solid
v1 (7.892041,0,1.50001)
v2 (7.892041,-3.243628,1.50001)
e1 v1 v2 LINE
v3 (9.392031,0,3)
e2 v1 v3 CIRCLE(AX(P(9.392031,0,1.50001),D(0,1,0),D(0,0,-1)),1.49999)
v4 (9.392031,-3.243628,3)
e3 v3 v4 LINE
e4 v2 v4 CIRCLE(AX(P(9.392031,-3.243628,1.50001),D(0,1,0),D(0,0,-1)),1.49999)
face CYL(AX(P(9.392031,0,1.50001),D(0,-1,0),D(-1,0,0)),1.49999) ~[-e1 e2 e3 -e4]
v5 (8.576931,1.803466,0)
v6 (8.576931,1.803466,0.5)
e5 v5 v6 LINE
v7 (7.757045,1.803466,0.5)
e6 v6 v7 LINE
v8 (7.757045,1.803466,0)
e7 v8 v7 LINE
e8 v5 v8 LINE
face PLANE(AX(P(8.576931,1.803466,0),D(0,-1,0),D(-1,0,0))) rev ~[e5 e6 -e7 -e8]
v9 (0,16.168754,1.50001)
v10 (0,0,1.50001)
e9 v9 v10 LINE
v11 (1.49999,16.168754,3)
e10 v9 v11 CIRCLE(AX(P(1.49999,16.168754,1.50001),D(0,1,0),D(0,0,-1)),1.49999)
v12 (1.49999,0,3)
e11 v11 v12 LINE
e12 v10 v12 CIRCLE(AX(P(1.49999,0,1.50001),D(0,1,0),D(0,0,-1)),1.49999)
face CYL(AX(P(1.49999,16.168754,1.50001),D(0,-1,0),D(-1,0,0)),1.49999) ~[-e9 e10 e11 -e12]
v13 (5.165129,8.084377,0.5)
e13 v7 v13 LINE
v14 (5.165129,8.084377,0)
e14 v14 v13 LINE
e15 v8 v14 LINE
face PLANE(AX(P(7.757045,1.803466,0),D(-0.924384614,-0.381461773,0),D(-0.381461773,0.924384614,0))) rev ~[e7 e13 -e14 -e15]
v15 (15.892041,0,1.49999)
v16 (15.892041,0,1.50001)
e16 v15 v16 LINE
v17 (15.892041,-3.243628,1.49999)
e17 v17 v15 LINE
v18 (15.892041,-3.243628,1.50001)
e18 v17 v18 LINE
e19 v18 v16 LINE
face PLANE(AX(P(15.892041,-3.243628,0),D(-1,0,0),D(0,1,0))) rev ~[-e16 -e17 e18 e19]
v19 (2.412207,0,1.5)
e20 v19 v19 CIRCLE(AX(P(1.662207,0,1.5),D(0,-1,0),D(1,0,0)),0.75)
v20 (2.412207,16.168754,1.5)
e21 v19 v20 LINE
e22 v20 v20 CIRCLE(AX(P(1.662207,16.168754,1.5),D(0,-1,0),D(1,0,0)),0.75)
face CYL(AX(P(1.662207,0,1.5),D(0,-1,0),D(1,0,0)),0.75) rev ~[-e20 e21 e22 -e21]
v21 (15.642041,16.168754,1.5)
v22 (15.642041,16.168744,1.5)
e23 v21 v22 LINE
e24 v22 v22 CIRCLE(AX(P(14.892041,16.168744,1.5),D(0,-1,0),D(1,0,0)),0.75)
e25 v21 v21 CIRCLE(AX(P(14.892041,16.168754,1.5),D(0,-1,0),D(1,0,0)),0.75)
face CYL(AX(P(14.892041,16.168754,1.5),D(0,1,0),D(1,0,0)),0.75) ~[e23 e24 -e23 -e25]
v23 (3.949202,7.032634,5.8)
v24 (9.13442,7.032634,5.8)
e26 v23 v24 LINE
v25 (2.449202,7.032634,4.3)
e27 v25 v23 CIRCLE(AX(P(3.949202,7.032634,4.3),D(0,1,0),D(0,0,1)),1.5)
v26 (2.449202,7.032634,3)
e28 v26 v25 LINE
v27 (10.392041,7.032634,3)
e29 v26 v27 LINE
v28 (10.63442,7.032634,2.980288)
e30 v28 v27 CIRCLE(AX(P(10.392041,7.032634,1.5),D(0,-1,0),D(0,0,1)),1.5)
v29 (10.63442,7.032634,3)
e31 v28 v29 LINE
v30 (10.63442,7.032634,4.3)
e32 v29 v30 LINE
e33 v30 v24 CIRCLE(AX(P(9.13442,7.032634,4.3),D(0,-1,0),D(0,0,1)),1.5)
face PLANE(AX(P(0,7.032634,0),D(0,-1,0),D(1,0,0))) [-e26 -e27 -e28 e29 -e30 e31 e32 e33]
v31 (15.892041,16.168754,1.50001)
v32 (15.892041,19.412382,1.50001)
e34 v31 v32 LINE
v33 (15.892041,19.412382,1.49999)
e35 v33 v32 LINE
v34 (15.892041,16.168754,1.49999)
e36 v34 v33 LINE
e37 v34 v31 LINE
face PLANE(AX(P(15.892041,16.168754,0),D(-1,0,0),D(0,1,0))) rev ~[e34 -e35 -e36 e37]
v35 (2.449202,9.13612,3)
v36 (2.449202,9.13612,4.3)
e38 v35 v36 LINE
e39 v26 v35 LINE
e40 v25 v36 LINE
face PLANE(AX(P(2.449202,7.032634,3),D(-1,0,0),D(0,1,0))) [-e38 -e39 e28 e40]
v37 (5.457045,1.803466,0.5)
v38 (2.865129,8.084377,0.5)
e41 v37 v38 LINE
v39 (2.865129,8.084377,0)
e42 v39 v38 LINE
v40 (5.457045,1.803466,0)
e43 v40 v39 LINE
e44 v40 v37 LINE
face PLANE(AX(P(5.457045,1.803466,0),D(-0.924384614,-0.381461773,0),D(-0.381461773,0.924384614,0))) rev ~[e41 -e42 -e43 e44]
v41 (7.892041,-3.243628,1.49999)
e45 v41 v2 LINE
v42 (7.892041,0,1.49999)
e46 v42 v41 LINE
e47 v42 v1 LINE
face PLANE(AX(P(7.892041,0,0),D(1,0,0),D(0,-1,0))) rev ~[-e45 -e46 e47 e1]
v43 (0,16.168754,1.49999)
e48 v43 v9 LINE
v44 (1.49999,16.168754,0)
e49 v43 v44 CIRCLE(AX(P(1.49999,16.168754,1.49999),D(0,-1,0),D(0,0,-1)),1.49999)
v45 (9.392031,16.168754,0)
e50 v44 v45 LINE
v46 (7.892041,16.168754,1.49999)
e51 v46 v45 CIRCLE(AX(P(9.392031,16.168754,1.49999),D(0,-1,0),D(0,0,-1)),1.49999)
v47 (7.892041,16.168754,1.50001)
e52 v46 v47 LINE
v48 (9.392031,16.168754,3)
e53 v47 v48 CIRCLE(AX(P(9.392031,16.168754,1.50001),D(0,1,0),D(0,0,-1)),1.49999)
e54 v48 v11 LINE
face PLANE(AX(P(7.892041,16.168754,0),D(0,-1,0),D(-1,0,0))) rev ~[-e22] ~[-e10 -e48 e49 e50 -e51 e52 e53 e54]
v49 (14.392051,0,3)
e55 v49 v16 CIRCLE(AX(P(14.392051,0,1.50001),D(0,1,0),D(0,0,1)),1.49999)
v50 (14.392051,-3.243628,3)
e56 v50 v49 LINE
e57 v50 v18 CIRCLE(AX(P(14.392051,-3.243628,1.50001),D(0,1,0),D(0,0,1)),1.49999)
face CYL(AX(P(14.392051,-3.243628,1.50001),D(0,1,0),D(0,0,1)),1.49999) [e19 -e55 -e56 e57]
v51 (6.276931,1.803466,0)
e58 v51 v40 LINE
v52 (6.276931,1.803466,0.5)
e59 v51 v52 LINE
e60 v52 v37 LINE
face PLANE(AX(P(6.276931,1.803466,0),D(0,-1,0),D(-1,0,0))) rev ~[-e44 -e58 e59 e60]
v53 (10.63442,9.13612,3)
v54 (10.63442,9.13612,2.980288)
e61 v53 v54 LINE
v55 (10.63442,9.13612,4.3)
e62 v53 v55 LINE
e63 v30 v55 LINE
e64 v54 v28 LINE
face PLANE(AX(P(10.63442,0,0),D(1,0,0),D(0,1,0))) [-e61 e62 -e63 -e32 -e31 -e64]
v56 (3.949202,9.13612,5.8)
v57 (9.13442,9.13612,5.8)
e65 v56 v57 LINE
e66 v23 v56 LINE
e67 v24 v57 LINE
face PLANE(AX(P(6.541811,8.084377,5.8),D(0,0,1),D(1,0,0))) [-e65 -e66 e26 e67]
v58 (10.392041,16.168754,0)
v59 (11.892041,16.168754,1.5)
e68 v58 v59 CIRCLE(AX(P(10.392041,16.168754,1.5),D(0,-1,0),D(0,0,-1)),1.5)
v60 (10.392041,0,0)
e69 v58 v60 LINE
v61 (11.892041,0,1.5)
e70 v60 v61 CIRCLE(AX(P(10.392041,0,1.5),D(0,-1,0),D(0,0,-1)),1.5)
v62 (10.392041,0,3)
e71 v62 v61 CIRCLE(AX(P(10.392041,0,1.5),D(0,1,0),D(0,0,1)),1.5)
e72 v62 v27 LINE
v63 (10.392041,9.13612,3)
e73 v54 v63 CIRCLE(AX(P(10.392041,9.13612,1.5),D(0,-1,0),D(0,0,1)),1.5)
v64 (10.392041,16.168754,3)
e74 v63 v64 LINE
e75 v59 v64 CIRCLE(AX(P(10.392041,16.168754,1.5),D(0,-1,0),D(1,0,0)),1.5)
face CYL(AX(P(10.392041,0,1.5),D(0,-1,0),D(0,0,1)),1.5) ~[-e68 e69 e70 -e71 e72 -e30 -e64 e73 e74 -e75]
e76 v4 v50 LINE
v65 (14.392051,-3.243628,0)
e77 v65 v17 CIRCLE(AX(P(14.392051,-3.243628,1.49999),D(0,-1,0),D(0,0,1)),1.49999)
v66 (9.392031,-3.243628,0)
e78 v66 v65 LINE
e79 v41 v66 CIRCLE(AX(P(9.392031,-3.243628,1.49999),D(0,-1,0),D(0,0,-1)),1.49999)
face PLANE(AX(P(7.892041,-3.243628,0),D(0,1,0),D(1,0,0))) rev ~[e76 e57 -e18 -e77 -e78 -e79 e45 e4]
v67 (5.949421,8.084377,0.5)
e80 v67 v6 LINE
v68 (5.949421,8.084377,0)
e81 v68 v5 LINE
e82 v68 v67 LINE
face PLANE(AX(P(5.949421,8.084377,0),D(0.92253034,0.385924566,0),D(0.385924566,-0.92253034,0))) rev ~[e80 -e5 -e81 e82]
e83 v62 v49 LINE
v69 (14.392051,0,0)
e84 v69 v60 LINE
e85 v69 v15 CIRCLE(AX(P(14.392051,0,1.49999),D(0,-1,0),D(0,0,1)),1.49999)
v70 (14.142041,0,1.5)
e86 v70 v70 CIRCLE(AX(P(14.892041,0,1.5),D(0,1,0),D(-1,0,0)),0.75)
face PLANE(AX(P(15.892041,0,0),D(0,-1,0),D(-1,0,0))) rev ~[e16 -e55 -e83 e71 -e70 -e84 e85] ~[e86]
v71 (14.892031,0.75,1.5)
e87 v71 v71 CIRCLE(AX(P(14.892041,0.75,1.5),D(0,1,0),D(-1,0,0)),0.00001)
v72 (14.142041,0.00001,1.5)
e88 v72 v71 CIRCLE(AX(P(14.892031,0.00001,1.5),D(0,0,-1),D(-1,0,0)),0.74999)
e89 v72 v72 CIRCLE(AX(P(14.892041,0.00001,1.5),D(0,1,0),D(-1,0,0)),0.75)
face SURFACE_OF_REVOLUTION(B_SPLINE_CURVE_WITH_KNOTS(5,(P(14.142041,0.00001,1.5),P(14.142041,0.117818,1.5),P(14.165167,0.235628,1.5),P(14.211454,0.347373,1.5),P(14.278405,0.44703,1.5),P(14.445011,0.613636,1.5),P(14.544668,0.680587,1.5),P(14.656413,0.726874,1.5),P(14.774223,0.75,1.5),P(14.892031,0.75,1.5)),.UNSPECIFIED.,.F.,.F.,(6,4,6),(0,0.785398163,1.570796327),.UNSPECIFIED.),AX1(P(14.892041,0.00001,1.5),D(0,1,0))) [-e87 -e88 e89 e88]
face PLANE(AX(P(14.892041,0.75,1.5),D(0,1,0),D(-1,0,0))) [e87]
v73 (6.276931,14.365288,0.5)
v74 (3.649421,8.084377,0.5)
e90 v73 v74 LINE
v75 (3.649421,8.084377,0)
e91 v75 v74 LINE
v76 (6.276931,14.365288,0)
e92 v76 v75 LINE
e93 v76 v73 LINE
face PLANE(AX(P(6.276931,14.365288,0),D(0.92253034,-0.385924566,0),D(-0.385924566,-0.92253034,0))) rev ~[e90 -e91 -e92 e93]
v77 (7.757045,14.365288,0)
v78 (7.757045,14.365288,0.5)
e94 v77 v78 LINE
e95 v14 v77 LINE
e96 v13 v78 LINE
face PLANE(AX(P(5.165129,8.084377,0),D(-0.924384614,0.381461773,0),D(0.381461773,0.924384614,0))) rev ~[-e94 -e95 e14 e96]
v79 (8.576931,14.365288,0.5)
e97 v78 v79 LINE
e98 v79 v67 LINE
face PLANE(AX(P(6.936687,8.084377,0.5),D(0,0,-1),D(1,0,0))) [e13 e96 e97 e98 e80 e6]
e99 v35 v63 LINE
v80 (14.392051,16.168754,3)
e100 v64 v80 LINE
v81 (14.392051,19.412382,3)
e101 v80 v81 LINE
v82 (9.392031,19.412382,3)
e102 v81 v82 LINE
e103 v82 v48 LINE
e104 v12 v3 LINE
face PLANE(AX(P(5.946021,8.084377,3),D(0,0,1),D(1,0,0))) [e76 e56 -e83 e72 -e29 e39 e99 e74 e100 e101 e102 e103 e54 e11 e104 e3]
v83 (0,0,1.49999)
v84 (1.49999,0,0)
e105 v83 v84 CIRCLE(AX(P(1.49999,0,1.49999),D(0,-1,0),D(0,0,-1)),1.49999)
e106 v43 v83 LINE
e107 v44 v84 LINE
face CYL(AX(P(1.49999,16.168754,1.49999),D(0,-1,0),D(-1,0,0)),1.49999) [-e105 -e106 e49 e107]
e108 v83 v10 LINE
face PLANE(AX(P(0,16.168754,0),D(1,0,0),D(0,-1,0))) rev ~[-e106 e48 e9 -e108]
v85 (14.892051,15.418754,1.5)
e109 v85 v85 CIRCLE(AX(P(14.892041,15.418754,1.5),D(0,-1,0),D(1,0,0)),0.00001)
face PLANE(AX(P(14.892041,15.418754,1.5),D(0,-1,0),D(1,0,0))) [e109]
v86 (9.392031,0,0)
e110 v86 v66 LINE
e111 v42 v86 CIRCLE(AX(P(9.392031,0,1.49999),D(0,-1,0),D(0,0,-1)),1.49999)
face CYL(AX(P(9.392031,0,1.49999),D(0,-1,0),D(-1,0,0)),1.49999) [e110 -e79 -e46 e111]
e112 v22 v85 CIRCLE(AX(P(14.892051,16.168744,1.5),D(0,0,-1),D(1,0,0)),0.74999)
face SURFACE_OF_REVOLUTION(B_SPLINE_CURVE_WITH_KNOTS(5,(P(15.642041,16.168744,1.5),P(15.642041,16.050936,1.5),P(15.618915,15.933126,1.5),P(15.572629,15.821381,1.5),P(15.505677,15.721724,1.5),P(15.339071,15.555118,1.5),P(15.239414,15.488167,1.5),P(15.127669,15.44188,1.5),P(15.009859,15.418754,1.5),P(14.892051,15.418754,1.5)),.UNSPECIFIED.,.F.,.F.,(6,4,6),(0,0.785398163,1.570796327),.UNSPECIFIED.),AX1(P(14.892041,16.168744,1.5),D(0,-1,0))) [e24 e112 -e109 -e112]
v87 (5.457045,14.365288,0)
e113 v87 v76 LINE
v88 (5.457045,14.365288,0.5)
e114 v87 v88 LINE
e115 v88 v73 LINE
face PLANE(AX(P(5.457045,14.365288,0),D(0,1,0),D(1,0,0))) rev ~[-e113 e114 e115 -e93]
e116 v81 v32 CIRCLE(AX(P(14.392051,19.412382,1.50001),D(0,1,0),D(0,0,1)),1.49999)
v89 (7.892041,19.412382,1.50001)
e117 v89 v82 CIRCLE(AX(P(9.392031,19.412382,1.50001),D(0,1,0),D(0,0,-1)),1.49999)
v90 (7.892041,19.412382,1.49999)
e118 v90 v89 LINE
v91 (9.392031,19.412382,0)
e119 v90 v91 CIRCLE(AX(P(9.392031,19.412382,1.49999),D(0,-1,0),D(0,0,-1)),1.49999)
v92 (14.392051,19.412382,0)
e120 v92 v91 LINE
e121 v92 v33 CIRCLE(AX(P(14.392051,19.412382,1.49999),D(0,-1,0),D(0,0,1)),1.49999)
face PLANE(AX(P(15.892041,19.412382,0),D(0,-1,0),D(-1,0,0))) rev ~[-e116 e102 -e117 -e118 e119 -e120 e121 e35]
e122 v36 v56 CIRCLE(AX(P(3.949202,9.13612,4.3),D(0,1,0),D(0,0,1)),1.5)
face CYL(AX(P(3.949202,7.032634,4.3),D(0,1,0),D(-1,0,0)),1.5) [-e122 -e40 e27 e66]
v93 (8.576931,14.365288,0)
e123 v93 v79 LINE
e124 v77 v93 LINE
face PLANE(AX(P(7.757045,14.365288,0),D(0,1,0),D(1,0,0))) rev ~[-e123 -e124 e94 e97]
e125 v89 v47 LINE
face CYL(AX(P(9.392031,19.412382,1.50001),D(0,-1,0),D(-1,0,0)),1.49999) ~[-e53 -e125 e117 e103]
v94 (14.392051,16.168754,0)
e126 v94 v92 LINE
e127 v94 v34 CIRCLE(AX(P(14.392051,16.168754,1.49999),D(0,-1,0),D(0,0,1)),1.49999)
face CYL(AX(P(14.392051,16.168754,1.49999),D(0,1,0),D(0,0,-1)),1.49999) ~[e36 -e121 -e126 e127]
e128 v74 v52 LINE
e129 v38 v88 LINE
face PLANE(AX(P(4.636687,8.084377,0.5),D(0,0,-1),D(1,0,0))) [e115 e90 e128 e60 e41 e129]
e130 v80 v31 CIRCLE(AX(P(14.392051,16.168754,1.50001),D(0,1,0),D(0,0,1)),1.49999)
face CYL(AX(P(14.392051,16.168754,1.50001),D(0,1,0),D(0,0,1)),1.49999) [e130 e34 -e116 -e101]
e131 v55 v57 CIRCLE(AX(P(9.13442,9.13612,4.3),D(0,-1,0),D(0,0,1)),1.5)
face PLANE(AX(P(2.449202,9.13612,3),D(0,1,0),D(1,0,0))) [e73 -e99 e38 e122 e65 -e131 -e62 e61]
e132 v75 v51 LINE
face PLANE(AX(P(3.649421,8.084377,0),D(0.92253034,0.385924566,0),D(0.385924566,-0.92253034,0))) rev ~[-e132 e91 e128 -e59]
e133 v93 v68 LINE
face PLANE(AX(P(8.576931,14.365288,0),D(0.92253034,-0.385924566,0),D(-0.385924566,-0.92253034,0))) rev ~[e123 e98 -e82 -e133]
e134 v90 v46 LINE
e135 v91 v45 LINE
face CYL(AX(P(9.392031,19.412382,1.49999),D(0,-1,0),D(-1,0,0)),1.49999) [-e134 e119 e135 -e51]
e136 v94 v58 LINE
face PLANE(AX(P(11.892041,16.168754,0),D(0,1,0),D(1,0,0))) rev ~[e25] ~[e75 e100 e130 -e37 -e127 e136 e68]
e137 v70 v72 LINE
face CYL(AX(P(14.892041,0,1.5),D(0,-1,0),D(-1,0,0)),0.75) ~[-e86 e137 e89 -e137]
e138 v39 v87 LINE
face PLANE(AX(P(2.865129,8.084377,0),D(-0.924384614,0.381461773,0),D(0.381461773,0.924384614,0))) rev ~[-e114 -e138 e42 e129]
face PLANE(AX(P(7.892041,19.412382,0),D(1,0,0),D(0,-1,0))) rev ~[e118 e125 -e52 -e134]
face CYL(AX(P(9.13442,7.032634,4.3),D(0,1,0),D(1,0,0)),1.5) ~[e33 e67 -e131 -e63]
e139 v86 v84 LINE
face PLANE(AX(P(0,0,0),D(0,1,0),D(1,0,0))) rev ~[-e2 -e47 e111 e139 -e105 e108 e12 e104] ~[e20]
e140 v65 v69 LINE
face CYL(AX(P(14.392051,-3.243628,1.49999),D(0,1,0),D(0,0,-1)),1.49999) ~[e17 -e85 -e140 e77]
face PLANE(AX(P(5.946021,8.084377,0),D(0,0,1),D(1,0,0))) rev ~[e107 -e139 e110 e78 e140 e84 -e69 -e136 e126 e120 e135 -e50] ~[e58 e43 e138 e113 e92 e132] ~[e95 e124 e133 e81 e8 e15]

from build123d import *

# Parameters (mm, degrees)
F1_DEPTH      = 3
F2_R          = 0.75
F3_DEPTH      = 0.75
F4_R          = 0.75
F5_DEPTH      = 0.75
F6_R          = 0.75
F7_DEPTH      = 25
F8_R          = 1.49999
F9_W          = 8.1852182662
F9_H          = 2.1034856807
F10_DEPTH     = 2.8
F11_R         = 1.5
F13_DEPTH     = 0.5
F14_R         = 0.74999
F15_T1_DEPTH  = 16.1687540342
F15_T6_DEPTH  = 19.9187540342
F15_T11_DEPTH = 19.9187540342
F15_T17_DEPTH = 19.9187540342
F16_R         = 1.49999


# Not quite as in the source:
# - a fillet or chamfer that OpenCascade refuses, or shapes differently, is made with other operations: its cross-section is extruded or revolved along the edge and cut away or added
# - a fillet or chamfer is up to 0.001 mm smaller than in the source, because OpenCascade refuses the exact size
# - a feature names something its author has since deleted; it is built from what else it names


with BuildPart() as f1:
    # F0 (on Top) → F1 (new body)
    with BuildSketch(Plane.XY):
        Polygon((0, 16.1687540342), (0, 0), (7.8920411056, 0), (11.8920411056, 0), (11.8920411056, 16.1687540342), (7.8920411056, 16.1687540342), align=None)
        Polygon((7.8920411056, 19.412382182), (7.8920411056, 16.1687540342), (11.8920411056, 16.1687540342), (15.8920411056, 16.1687540342), (15.8920411056, 19.412382182), align=None)
        Polygon((11.8920411056, 0), (7.8920411056, 0), (7.8920411056, -3.2436281478), (15.8920411056, -3.2436281478), (15.8920411056, 0), align=None)
    extrude(amount=F1_DEPTH)

    # F2 (on face) → F3 (join)
    with BuildSketch(Plane.XZ.offset(-16.1687540342)):
        with Locations((14.8920411056, 1.5)):
            Circle(F2_R)
    extrude(amount=F3_DEPTH)

    # F4 (on face) → F5 (join)
    with BuildSketch(Plane(origin=(0, 0, 0), x_dir=(-1, 0, 0), z_dir=(0, 1, 0))):
        with Locations((-14.8920411056, 1.5)):
            Circle(F4_R)
    extrude(amount=F5_DEPTH)

    # F6 (on face) → F7 (cut)
    with BuildSketch(Plane.XZ):
        with Locations((1.6622071853, 1.5)):
            Circle(F6_R)
    extrude(amount=-F7_DEPTH, mode=Mode.SUBTRACT)

    # F8 (radius 1.5 in the source; OpenCascade refuses exactly that, so slightly less here)
    f8_edges = [f1.edges().sort_by_distance(p)[0] for p in [
        (0, 8.084377, 3),
        (0, 8.084377, 0),
        (15.892041, 17.790568, 3),
        (15.892041, 17.790568, 0),
        (15.892041, -1.621814, 3),
        (15.892041, -1.621814, 0),
    ]]
    fillet(f8_edges, radius=F8_R)

    # F9 (on face) → F10 (join)
    with BuildSketch(Plane.XY.offset(3)):
        with Locations((6.5418113065, 8.0843770171)):
            Rectangle(F9_W, F9_H)
    extrude(amount=F10_DEPTH)

    # F11
    f11_edges = [f1.edges().sort_by_distance(p)[0] for p in [
        (10.63442, 8.084377, 5.8),
        (2.449202, 8.084377, 5.8),
    ]]
    fillet(f11_edges, radius=F11_R)

    # F12 (on face) → F13 (cut)
    with BuildSketch(Plane(origin=(0, 0, 0), x_dir=(1, 0, 0), z_dir=(0, 0, -1))):
        Polygon((5.4570450447, -1.8034656052), (2.8651286848, -8.0843770171), (5.4570450447, -14.365288429), (6.276931148, -14.365288429), (3.6494208034, -8.0843770171), (6.276931148, -1.8034656052), align=None)
        Polygon((7.7570450447, -1.8034656052), (5.1651286848, -8.0843770171), (7.7570450447, -14.365288429), (8.576931148, -14.365288429), (5.9494208034, -8.0843770171), (8.576931148, -1.8034656052), align=None)
    extrude(amount=-F13_DEPTH, mode=Mode.SUBTRACT)

    # F14 (radius 0.75 in the source; OpenCascade refuses exactly that, so slightly less here)
    f14_edges = [f1.edges().sort_by_distance(p)[0] for p in [
        (15.642041, 0.75, 1.5),
        (14.142041, 15.418754, 1.5),
    ]]
    fillet(f14_edges, radius=F14_R)

    # F15: fillet of radius 1.5 on 2 edges, made by hand

    # F15_s2 → F15_t1 (cut)
    with BuildSketch(Plane.XZ.offset(-16.1687540342)):
        with BuildLine():
            ThreePointArc((10.3920411056, 0), (11.4527012774, 0.4393398282), (11.8920411056, 1.5))
            Line((11.8920411056, 1.5), (11.8920411056, 0))
            Line((11.8920411056, 0), (10.3920411056, 0))
        make_face()
    extrude(amount=F15_T1_DEPTH, mode=Mode.SUBTRACT)


with BuildPart() as f15_tool4:
    # F15_s5 → F15_t6 (new body)
    with BuildSketch(Plane.XZ):
        with BuildLine():
            ThreePointArc((10.3920411056, 3), (11.4527012774, 2.5606601718), (11.8920411056, 1.5))
            Line((11.8920411056, 1.5), (11.8920411056, 3))
            Line((11.8920411056, 3), (10.3920411056, 3))
        make_face()
    extrude(amount=-F15_T6_DEPTH)

    split(bisect_by=Plane.XZ.offset(-7.0326341767), keep=Keep.TOP)


with BuildPart() as f1_1:
    add(f1.part)

    # F15_t3: cut F15_tool4
    add(f15_tool4.part, mode=Mode.SUBTRACT)


with BuildPart() as f15_tool9:
    # F15_s10 → F15_t11 (new body)
    with BuildSketch(Plane.XZ.offset(3.75)):
        with BuildLine():
            ThreePointArc((10.3920411056, 3), (11.4527012774, 2.5606601718), (11.8920411056, 1.5))
            Line((11.8920411056, 1.5), (11.8920411056, 3))
            Line((11.8920411056, 3), (10.3920411056, 3))
        make_face()
    extrude(amount=-F15_T11_DEPTH)

    split(bisect_by=Plane.XZ.offset(-7.0326341767), keep=Keep.BOTTOM)

    split(bisect_by=Plane.YZ.offset(10.6344204396), keep=Keep.TOP)


with BuildPart() as f1_2:
    add(f1_1.part)

    # F15_t8: cut F15_tool9
    add(f15_tool9.part, mode=Mode.SUBTRACT)


with BuildPart() as f15_tool15:
    # F15_s16 → F15_t17 (new body)
    with BuildSketch(Plane.XZ.offset(3.75)):
        with BuildLine():
            ThreePointArc((10.3920411056, 3), (11.4527012774, 2.5606601718), (11.8920411056, 1.5))
            Line((11.8920411056, 1.5), (11.8920411056, 3))
            Line((11.8920411056, 3), (10.3920411056, 3))
        make_face()
    extrude(amount=-F15_T17_DEPTH)

    split(bisect_by=Plane.XZ.offset(-9.1361198574), keep=Keep.BOTTOM)


with BuildPart() as f1_3:
    add(f1_2.part)

    # F15_t14: cut F15_tool15
    add(f15_tool15.part, mode=Mode.SUBTRACT)

    # F16 (radius 1.5 in the source; OpenCascade refuses exactly that, so slightly less here)
    f16_edges = [f1_3.edges().sort_by_distance(p)[0] for p in [
        (7.892041, -1.621814, 3),
        (7.892041, -1.621814, 0),
        (7.892041, 17.790568, 3),
        (7.892041, 17.790568, 0),
    ]]
    fillet(f16_edges, radius=F16_R)


solid = f1_3.part
